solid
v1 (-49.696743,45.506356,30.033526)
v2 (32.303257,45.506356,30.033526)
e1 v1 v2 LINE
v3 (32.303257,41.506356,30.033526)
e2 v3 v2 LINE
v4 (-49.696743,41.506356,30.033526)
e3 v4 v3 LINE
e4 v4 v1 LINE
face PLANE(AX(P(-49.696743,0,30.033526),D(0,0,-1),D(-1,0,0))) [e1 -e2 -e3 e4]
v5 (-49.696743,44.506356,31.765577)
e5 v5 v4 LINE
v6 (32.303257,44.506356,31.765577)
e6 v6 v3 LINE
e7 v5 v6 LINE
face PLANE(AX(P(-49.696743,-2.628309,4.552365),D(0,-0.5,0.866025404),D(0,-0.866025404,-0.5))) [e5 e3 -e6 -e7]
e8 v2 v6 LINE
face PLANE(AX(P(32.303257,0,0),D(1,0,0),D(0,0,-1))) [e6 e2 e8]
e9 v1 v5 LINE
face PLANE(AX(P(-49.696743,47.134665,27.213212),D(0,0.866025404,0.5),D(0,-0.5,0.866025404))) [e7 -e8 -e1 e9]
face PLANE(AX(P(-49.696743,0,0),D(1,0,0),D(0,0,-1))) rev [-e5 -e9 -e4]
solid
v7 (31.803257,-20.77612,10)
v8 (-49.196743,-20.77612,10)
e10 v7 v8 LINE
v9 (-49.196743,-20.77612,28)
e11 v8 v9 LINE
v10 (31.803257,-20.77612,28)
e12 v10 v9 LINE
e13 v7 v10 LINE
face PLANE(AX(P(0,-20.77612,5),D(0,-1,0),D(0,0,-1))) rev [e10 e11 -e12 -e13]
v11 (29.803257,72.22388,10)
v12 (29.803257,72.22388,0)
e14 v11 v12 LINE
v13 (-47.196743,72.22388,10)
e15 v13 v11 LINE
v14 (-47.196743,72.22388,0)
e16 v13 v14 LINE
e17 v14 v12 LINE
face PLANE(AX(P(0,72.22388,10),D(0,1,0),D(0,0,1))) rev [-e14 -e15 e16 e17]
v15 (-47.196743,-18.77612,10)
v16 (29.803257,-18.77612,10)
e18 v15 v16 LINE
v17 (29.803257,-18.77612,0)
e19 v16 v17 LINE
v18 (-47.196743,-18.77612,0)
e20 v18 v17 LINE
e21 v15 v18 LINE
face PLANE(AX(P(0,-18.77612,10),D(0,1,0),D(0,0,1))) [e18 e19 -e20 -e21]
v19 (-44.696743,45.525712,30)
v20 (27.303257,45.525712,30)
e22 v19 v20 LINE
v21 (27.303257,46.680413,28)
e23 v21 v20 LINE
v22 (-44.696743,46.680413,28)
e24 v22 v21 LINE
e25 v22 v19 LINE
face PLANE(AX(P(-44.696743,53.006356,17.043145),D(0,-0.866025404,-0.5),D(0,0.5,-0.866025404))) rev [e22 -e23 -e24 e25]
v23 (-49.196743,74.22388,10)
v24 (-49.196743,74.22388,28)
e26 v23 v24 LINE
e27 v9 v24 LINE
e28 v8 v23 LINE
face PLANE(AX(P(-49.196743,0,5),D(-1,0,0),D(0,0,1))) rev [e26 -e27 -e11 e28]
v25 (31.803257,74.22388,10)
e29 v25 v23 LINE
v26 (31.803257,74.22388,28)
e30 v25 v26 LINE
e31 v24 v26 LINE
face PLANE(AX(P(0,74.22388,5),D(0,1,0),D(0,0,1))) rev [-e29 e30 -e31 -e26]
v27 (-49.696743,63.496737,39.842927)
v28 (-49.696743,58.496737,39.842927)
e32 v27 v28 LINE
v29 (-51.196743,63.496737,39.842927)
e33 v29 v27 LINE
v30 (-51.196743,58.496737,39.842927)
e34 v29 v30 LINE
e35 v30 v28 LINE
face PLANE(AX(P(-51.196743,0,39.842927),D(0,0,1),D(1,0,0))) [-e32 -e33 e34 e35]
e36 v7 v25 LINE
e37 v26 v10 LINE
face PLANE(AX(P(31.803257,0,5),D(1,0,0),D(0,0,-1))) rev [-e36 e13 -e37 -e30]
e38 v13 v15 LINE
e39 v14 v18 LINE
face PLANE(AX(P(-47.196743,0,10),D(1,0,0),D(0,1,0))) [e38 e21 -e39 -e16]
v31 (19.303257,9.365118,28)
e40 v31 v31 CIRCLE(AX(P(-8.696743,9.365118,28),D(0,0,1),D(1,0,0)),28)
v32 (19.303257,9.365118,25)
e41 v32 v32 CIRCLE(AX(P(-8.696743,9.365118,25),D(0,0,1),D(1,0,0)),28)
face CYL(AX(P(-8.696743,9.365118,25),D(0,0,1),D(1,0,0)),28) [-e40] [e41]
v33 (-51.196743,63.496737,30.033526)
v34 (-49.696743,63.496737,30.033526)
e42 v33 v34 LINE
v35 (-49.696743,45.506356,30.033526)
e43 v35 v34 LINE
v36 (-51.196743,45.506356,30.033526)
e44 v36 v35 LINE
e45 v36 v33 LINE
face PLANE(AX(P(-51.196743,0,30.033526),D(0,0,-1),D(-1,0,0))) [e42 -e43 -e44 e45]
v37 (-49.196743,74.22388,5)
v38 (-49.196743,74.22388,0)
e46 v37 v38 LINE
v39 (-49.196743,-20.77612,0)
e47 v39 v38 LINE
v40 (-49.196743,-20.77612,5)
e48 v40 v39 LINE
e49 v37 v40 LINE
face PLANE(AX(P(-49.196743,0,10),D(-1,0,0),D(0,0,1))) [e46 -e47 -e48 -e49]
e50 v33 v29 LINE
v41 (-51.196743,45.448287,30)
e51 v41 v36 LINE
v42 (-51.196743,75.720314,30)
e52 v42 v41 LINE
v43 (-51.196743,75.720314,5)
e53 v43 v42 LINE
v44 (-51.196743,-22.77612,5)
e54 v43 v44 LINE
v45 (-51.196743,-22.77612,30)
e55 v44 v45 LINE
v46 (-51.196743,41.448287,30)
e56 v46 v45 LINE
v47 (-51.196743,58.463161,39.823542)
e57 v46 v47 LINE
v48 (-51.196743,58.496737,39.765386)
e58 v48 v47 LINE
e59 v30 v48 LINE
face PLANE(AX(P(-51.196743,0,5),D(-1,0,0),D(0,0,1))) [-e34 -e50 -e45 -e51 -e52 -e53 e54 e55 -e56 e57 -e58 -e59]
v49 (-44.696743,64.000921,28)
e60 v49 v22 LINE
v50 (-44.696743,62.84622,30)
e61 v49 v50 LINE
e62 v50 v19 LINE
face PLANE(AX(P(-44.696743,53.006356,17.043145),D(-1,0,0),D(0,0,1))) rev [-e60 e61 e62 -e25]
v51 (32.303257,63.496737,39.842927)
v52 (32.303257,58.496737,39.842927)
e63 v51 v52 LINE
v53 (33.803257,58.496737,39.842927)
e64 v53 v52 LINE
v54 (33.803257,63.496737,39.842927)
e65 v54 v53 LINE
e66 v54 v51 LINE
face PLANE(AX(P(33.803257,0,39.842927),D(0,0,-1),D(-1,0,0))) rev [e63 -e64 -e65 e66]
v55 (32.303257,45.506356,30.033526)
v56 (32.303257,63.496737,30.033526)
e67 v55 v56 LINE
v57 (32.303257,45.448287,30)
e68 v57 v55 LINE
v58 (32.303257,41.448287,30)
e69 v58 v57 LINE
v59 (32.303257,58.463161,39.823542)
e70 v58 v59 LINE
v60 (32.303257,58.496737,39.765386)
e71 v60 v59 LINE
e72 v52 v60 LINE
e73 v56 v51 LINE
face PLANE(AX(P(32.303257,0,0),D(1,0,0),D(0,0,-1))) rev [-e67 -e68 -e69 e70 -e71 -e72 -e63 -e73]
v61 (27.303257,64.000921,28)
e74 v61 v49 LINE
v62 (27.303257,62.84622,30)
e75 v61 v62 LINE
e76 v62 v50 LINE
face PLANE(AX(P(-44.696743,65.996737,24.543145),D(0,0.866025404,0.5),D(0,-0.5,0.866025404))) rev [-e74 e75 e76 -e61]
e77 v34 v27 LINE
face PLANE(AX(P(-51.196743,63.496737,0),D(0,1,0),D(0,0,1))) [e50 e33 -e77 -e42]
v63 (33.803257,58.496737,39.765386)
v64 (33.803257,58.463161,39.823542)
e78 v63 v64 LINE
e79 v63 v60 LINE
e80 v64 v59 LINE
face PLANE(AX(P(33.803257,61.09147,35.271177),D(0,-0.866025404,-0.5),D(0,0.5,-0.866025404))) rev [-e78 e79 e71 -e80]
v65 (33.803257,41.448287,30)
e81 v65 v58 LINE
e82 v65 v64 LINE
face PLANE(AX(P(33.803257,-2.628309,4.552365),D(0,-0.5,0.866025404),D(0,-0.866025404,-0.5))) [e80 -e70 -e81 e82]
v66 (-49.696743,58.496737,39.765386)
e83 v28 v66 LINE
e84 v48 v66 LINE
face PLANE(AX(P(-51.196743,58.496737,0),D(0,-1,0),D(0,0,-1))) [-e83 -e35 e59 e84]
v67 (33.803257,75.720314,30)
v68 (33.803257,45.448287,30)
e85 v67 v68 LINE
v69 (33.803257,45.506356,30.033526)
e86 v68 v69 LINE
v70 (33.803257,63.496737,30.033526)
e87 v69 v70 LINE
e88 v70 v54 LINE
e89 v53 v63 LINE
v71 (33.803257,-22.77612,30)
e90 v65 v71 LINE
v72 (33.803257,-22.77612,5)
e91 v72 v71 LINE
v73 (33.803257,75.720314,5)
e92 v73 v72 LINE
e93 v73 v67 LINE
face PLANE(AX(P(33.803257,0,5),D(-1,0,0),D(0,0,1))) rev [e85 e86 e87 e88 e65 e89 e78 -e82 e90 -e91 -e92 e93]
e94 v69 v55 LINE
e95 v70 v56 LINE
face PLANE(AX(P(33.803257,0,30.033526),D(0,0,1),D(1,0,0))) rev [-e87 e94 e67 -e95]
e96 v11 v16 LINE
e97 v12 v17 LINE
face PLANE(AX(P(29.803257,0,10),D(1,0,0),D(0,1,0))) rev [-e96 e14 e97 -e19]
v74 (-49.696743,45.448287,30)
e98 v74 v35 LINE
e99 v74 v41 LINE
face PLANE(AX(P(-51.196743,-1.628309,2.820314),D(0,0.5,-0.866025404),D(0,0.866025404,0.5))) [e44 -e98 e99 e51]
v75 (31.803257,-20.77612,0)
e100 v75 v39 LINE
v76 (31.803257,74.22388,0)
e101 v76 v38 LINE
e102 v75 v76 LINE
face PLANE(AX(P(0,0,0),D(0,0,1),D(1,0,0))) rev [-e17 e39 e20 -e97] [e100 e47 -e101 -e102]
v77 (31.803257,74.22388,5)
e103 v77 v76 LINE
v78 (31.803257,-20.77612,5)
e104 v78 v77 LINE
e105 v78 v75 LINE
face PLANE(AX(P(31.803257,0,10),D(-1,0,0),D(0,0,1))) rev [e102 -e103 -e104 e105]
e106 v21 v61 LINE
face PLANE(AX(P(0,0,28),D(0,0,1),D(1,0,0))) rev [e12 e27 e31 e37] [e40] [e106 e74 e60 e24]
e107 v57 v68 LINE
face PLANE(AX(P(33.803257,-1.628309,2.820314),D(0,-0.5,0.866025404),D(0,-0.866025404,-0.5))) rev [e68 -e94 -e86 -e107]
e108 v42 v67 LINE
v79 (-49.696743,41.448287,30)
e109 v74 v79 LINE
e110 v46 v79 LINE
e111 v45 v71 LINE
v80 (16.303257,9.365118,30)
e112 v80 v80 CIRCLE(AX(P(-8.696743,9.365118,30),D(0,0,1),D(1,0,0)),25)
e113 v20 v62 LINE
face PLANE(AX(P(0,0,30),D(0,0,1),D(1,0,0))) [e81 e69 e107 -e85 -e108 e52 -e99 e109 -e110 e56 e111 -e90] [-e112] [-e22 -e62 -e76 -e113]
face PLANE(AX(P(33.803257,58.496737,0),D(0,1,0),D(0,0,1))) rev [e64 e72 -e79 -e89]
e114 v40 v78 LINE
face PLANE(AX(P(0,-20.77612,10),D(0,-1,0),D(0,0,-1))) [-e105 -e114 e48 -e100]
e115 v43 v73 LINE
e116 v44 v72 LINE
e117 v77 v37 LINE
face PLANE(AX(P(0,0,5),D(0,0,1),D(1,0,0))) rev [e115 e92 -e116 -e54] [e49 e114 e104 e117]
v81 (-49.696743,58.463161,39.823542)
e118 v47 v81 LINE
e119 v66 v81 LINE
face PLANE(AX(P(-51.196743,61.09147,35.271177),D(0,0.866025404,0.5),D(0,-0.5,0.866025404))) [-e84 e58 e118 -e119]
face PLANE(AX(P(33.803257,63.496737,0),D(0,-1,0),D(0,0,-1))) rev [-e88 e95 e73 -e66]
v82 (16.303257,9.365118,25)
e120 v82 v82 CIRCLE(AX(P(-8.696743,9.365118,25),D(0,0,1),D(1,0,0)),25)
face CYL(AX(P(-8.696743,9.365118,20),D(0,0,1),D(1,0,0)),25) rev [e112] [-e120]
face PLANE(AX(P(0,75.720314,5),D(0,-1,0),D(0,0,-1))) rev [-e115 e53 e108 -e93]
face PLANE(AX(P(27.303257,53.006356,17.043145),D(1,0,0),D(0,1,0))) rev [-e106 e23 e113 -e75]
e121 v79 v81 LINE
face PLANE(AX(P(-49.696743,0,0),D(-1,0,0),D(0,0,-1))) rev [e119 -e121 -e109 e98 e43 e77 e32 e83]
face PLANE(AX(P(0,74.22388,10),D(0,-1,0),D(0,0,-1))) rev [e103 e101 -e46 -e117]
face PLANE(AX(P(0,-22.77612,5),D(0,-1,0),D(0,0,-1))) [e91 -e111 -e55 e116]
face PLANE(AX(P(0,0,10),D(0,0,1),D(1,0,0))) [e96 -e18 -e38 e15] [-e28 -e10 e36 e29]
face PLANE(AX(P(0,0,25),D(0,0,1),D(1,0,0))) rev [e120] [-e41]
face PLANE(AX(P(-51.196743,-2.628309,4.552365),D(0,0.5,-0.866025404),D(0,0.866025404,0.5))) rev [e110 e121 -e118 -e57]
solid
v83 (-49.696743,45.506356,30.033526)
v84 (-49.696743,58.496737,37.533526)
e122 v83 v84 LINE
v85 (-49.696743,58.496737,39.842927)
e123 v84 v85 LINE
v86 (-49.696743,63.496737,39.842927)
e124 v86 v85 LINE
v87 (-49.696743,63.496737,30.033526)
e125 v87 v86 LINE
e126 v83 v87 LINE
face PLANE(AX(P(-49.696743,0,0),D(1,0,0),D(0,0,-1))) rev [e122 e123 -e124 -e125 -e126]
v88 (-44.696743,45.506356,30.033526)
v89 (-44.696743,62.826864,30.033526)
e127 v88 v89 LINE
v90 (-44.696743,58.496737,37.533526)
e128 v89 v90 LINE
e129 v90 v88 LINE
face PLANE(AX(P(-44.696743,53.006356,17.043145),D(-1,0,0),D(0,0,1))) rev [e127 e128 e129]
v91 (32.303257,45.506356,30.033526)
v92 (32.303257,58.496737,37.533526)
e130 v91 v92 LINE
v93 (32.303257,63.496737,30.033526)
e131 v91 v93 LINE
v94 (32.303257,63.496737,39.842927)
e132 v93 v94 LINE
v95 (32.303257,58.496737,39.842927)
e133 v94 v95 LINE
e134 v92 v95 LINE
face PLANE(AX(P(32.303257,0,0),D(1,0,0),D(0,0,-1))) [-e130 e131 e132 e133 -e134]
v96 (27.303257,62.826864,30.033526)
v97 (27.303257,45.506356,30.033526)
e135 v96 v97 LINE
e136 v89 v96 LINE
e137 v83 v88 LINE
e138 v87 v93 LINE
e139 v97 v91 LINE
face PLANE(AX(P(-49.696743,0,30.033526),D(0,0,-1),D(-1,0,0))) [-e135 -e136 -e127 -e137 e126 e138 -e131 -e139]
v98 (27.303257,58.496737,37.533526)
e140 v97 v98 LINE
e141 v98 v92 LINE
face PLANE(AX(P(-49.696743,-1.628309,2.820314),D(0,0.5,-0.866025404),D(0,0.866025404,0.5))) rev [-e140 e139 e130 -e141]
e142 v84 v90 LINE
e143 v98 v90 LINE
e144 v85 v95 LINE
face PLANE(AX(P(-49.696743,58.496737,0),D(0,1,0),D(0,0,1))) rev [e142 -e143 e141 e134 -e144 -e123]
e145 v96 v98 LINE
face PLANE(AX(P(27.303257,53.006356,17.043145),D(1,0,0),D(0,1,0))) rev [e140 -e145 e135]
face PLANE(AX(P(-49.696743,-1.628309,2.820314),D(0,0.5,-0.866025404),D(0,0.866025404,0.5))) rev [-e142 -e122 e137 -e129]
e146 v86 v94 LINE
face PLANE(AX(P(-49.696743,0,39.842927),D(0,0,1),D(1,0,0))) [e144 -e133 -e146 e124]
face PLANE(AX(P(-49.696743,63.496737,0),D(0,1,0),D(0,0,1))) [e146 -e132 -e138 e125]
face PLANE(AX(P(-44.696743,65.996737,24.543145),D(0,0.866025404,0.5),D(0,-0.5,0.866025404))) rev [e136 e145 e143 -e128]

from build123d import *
from build123d.topology import SkipClean

# Parameters (mm, degrees)
SKETCH1_W                  = 2
SKETCH1_H                  = 2
BOSS_EXTRUDE1_DEPTH        = 10
BOSS_EXTRUDE3_DEPTH        = 20
BOSS_EXTRUDE3_DEPTH_BACK   = 5
SKETCH2_W                  = 85
SKETCH2_H                  = 98.49643328
SKETCH2_W_2                = 81
SKETCH2_H_2                = 95
SKETCH3_W                  = 81
SKETCH3_H                  = 95
BOSS_EXTRUDE4_DEPTH        = 2
BOSS_EXTRUDE6_DEPTH        = 41
BOSS_EXTRUDE6_DEPTH_BACK   = 41
BOSS_EXTRUDE6_2_DEPTH      = 41
BOSS_EXTRUDE6_2_DEPTH_BACK = 41
BOSS_EXTRUDE7_DEPTH        = 1.5
SKETCH15_W                 = 72
SKETCH15_H                 = 15
CUT_EXTRUDE2_DEPTH         = 15
CUT_EXTRUDE3_DEPTH         = 10
BOSS_EXTRUDE8_DEPTH        = 5


# Read off the part's stored shape, not the designer's step: Boss-Extrude7
with BuildPart() as part:
    # Sketch1 → Boss-Extrude1 (new body)
    with BuildSketch(Plane.XY):
        Polygon((-49.196743418, -18.776119502), (-47.196743418, -18.776119502), (-47.196743418, 72.223880498), (-24.196743418, 72.223880498), (-22.196743418, 72.223880498), (29.803256582, 72.223880498), (29.803256582, 74.223880498), (-49.196743418, 74.223880498), align=None)
        Polygon((-24.196743418, -18.776119502), (-47.196743418, -18.776119502), (-47.196743418, -20.776119502), (31.803256582, -20.776119502), (31.803256582, 72.223880498), (29.803256582, 72.223880498), (29.803256582, -18.776119502), (-22.196743418, -18.776119502), align=None)
        with Locations((-48.196743418, -19.776119502)):
            Rectangle(SKETCH1_W, SKETCH1_H)
        with Locations((30.803256582, 73.223880498)):
            Rectangle(SKETCH1_W, SKETCH1_H)
    extrude(amount=BOSS_EXTRUDE1_DEPTH)

    # Sketch2 → Boss-Extrude3 (add, two sides: drawn at the far end of the back side and taken through both)
    with BuildSketch(Plane.XY.offset(10).offset(-BOSS_EXTRUDE3_DEPTH_BACK)):
        with Locations((-8.696743418, 26.472097138)):
            Rectangle(SKETCH2_W, SKETCH2_H)
        with Locations((-8.696743418, 26.723880498)):
            Rectangle(SKETCH2_W_2, SKETCH2_H_2, mode=Mode.SUBTRACT)
    extrude(amount=BOSS_EXTRUDE3_DEPTH + BOSS_EXTRUDE3_DEPTH_BACK)

    # Sketch3 → Boss-Extrude4 (add)
    with BuildSketch(Plane.XY.offset(30)):
        with Locations((-8.696743418, 26.723880498)):
            Rectangle(SKETCH3_W, SKETCH3_H)
    extrude(amount=-BOSS_EXTRUDE4_DEPTH)

    # Boss-Extrude7 outline → Boss-Extrude7 (add)
    with BuildSketch(Plane(origin=(32.303256582, 0, 0), x_dir=(0, 0, -1), z_dir=(1, 0, 0))):
        Polygon((-39.842927076, 63.496736875), (-39.842927076, 58.496736875), (-39.765386314, 58.496736875), (-39.823541886, 58.46316074), (-30, 41.448287084), (-30, 45.448287084), (-30.033525999, 45.506355818), (-30.033525999, 63.496736875), align=None)
    boss_extrude7 = extrude(amount=BOSS_EXTRUDE7_DEPTH)

    # Mirror2: Boss-Extrude7 across plane
    add(boss_extrude7.mirror(Plane(origin=(-8.696743418, 0, 0), x_dir=(0, 0, 1), z_dir=(1, 0, 0))))


with BuildPart() as body_2:
    # Sketch9 → Boss-Extrude6 (new, two sides: drawn at the far end of the back side and taken through both)
    with BuildSketch(Plane(origin=(-8.696743418, 0, 0), x_dir=(0, 0, -1), z_dir=(1, 0, 0)).offset(-BOSS_EXTRUDE6_DEPTH_BACK)):
        Polygon((-30.033525999, 45.506355818), (-30.033525999, 63.496736875), (-39.842927076, 63.496736875), (-39.842927076, 58.496736875), (-37.533525999, 58.496736875), align=None)
    extrude(amount=BOSS_EXTRUDE6_DEPTH + BOSS_EXTRUDE6_DEPTH_BACK)


with BuildPart() as body_3:
    # Sketch9 → Boss-Extrude6 2 (new, two sides: drawn at the far end of the back side and taken through both)
    with BuildSketch(Plane(origin=(-8.696743418, 0, 0), x_dir=(0, 0, -1), z_dir=(1, 0, 0)).offset(-BOSS_EXTRUDE6_2_DEPTH_BACK)):
        Polygon((-30.033525999, 41.506355818), (-30.033525999, 45.506355818), (-31.765576807, 44.506355818), align=None)
    extrude(amount=BOSS_EXTRUDE6_2_DEPTH + BOSS_EXTRUDE6_2_DEPTH_BACK)


with BuildPart() as cut_extrude2_tool:
    # Sketch15 → Cut-Extrude2 (new body)
    with BuildSketch(Plane(origin=(0, -1.628309286, 2.820314413), x_dir=(1, 0, 0), z_dir=(0, -0.5000000000000001, 0.8660254037844386))):
        with Locations((-8.696743418, 61.926423172)):
            Rectangle(SKETCH15_W, SKETCH15_H)
    extrude(amount=-CUT_EXTRUDE2_DEPTH)


with BuildPart() as part_1:
    add(part.part)

    # Cut-Extrude2: cut by cut_extrude2_tool
    add(cut_extrude2_tool.part, mode=Mode.SUBTRACT)

    # Sketch16 → Cut-Extrude3 (cut)
    with BuildSketch(Plane.XY.offset(30)):
        with BuildLine():
            ThreePointArc((-8.696743418, 34.365118158), (-33.696743418, 9.365118158), (-8.696743418, -15.634881842))
            Line((-8.696743418, -15.634881842), (-8.696743418, 34.365118158))
        make_face()
        with BuildLine():
            Line((-8.696743418, 34.365118158), (-8.696743418, -15.634881842))
            ThreePointArc((-8.696743418, -15.634881842), (8.980926112, -8.312551372), (16.303256582, 9.365118158))
            ThreePointArc((16.303256582, 9.365118158), (8.980926112, 27.042787688), (-8.696743418, 34.365118158))
        make_face()
    extrude(amount=-CUT_EXTRUDE3_DEPTH, mode=Mode.SUBTRACT)

    # Sketch16<3> → Boss-Extrude8 (add)
    with SkipClean():  # the faces are left unmerged after this step: merging them gives an invalid solid
        with BuildSketch(Plane.XY.offset(30)):
            with BuildLine():
                ThreePointArc((-8.696743418, 37.365118158), (-36.696743418, 9.365118158), (-8.696743418, -18.634881842))
                Line((-8.696743418, -18.634881842), (-8.696743418, -15.634881842))
                ThreePointArc((-8.696743418, -15.634881842), (-33.696743418, 9.365118158), (-8.696743418, 34.365118158))
                Line((-8.696743418, 34.365118158), (-8.696743418, 37.365118158))
            make_face()
            with BuildLine():
                Line((-8.696743418, -15.634881842), (-8.696743418, -18.634881842))
                ThreePointArc((-8.696743418, -18.634881842), (11.102246456, -10.433871715), (19.303256582, 9.365118158))
                ThreePointArc((19.303256582, 9.365118158), (11.102246456, 29.164108031), (-8.696743418, 37.365118158))
                Line((-8.696743418, 37.365118158), (-8.696743418, 34.365118158))
                ThreePointArc((-8.696743418, 34.365118158), (8.980926112, 27.042787688), (16.303256582, 9.365118158))
                ThreePointArc((16.303256582, 9.365118158), (8.980926112, -8.312551372), (-8.696743418, -15.634881842))
            make_face()
        extrude(amount=-BOSS_EXTRUDE8_DEPTH)


with BuildPart() as body_2_1:
    add(body_2.part)

    # Cut-Extrude2: cut by cut_extrude2_tool
    add(cut_extrude2_tool.part, mode=Mode.SUBTRACT)


solid = Compound([body_3.part, part_1.part, body_2_1.part])
